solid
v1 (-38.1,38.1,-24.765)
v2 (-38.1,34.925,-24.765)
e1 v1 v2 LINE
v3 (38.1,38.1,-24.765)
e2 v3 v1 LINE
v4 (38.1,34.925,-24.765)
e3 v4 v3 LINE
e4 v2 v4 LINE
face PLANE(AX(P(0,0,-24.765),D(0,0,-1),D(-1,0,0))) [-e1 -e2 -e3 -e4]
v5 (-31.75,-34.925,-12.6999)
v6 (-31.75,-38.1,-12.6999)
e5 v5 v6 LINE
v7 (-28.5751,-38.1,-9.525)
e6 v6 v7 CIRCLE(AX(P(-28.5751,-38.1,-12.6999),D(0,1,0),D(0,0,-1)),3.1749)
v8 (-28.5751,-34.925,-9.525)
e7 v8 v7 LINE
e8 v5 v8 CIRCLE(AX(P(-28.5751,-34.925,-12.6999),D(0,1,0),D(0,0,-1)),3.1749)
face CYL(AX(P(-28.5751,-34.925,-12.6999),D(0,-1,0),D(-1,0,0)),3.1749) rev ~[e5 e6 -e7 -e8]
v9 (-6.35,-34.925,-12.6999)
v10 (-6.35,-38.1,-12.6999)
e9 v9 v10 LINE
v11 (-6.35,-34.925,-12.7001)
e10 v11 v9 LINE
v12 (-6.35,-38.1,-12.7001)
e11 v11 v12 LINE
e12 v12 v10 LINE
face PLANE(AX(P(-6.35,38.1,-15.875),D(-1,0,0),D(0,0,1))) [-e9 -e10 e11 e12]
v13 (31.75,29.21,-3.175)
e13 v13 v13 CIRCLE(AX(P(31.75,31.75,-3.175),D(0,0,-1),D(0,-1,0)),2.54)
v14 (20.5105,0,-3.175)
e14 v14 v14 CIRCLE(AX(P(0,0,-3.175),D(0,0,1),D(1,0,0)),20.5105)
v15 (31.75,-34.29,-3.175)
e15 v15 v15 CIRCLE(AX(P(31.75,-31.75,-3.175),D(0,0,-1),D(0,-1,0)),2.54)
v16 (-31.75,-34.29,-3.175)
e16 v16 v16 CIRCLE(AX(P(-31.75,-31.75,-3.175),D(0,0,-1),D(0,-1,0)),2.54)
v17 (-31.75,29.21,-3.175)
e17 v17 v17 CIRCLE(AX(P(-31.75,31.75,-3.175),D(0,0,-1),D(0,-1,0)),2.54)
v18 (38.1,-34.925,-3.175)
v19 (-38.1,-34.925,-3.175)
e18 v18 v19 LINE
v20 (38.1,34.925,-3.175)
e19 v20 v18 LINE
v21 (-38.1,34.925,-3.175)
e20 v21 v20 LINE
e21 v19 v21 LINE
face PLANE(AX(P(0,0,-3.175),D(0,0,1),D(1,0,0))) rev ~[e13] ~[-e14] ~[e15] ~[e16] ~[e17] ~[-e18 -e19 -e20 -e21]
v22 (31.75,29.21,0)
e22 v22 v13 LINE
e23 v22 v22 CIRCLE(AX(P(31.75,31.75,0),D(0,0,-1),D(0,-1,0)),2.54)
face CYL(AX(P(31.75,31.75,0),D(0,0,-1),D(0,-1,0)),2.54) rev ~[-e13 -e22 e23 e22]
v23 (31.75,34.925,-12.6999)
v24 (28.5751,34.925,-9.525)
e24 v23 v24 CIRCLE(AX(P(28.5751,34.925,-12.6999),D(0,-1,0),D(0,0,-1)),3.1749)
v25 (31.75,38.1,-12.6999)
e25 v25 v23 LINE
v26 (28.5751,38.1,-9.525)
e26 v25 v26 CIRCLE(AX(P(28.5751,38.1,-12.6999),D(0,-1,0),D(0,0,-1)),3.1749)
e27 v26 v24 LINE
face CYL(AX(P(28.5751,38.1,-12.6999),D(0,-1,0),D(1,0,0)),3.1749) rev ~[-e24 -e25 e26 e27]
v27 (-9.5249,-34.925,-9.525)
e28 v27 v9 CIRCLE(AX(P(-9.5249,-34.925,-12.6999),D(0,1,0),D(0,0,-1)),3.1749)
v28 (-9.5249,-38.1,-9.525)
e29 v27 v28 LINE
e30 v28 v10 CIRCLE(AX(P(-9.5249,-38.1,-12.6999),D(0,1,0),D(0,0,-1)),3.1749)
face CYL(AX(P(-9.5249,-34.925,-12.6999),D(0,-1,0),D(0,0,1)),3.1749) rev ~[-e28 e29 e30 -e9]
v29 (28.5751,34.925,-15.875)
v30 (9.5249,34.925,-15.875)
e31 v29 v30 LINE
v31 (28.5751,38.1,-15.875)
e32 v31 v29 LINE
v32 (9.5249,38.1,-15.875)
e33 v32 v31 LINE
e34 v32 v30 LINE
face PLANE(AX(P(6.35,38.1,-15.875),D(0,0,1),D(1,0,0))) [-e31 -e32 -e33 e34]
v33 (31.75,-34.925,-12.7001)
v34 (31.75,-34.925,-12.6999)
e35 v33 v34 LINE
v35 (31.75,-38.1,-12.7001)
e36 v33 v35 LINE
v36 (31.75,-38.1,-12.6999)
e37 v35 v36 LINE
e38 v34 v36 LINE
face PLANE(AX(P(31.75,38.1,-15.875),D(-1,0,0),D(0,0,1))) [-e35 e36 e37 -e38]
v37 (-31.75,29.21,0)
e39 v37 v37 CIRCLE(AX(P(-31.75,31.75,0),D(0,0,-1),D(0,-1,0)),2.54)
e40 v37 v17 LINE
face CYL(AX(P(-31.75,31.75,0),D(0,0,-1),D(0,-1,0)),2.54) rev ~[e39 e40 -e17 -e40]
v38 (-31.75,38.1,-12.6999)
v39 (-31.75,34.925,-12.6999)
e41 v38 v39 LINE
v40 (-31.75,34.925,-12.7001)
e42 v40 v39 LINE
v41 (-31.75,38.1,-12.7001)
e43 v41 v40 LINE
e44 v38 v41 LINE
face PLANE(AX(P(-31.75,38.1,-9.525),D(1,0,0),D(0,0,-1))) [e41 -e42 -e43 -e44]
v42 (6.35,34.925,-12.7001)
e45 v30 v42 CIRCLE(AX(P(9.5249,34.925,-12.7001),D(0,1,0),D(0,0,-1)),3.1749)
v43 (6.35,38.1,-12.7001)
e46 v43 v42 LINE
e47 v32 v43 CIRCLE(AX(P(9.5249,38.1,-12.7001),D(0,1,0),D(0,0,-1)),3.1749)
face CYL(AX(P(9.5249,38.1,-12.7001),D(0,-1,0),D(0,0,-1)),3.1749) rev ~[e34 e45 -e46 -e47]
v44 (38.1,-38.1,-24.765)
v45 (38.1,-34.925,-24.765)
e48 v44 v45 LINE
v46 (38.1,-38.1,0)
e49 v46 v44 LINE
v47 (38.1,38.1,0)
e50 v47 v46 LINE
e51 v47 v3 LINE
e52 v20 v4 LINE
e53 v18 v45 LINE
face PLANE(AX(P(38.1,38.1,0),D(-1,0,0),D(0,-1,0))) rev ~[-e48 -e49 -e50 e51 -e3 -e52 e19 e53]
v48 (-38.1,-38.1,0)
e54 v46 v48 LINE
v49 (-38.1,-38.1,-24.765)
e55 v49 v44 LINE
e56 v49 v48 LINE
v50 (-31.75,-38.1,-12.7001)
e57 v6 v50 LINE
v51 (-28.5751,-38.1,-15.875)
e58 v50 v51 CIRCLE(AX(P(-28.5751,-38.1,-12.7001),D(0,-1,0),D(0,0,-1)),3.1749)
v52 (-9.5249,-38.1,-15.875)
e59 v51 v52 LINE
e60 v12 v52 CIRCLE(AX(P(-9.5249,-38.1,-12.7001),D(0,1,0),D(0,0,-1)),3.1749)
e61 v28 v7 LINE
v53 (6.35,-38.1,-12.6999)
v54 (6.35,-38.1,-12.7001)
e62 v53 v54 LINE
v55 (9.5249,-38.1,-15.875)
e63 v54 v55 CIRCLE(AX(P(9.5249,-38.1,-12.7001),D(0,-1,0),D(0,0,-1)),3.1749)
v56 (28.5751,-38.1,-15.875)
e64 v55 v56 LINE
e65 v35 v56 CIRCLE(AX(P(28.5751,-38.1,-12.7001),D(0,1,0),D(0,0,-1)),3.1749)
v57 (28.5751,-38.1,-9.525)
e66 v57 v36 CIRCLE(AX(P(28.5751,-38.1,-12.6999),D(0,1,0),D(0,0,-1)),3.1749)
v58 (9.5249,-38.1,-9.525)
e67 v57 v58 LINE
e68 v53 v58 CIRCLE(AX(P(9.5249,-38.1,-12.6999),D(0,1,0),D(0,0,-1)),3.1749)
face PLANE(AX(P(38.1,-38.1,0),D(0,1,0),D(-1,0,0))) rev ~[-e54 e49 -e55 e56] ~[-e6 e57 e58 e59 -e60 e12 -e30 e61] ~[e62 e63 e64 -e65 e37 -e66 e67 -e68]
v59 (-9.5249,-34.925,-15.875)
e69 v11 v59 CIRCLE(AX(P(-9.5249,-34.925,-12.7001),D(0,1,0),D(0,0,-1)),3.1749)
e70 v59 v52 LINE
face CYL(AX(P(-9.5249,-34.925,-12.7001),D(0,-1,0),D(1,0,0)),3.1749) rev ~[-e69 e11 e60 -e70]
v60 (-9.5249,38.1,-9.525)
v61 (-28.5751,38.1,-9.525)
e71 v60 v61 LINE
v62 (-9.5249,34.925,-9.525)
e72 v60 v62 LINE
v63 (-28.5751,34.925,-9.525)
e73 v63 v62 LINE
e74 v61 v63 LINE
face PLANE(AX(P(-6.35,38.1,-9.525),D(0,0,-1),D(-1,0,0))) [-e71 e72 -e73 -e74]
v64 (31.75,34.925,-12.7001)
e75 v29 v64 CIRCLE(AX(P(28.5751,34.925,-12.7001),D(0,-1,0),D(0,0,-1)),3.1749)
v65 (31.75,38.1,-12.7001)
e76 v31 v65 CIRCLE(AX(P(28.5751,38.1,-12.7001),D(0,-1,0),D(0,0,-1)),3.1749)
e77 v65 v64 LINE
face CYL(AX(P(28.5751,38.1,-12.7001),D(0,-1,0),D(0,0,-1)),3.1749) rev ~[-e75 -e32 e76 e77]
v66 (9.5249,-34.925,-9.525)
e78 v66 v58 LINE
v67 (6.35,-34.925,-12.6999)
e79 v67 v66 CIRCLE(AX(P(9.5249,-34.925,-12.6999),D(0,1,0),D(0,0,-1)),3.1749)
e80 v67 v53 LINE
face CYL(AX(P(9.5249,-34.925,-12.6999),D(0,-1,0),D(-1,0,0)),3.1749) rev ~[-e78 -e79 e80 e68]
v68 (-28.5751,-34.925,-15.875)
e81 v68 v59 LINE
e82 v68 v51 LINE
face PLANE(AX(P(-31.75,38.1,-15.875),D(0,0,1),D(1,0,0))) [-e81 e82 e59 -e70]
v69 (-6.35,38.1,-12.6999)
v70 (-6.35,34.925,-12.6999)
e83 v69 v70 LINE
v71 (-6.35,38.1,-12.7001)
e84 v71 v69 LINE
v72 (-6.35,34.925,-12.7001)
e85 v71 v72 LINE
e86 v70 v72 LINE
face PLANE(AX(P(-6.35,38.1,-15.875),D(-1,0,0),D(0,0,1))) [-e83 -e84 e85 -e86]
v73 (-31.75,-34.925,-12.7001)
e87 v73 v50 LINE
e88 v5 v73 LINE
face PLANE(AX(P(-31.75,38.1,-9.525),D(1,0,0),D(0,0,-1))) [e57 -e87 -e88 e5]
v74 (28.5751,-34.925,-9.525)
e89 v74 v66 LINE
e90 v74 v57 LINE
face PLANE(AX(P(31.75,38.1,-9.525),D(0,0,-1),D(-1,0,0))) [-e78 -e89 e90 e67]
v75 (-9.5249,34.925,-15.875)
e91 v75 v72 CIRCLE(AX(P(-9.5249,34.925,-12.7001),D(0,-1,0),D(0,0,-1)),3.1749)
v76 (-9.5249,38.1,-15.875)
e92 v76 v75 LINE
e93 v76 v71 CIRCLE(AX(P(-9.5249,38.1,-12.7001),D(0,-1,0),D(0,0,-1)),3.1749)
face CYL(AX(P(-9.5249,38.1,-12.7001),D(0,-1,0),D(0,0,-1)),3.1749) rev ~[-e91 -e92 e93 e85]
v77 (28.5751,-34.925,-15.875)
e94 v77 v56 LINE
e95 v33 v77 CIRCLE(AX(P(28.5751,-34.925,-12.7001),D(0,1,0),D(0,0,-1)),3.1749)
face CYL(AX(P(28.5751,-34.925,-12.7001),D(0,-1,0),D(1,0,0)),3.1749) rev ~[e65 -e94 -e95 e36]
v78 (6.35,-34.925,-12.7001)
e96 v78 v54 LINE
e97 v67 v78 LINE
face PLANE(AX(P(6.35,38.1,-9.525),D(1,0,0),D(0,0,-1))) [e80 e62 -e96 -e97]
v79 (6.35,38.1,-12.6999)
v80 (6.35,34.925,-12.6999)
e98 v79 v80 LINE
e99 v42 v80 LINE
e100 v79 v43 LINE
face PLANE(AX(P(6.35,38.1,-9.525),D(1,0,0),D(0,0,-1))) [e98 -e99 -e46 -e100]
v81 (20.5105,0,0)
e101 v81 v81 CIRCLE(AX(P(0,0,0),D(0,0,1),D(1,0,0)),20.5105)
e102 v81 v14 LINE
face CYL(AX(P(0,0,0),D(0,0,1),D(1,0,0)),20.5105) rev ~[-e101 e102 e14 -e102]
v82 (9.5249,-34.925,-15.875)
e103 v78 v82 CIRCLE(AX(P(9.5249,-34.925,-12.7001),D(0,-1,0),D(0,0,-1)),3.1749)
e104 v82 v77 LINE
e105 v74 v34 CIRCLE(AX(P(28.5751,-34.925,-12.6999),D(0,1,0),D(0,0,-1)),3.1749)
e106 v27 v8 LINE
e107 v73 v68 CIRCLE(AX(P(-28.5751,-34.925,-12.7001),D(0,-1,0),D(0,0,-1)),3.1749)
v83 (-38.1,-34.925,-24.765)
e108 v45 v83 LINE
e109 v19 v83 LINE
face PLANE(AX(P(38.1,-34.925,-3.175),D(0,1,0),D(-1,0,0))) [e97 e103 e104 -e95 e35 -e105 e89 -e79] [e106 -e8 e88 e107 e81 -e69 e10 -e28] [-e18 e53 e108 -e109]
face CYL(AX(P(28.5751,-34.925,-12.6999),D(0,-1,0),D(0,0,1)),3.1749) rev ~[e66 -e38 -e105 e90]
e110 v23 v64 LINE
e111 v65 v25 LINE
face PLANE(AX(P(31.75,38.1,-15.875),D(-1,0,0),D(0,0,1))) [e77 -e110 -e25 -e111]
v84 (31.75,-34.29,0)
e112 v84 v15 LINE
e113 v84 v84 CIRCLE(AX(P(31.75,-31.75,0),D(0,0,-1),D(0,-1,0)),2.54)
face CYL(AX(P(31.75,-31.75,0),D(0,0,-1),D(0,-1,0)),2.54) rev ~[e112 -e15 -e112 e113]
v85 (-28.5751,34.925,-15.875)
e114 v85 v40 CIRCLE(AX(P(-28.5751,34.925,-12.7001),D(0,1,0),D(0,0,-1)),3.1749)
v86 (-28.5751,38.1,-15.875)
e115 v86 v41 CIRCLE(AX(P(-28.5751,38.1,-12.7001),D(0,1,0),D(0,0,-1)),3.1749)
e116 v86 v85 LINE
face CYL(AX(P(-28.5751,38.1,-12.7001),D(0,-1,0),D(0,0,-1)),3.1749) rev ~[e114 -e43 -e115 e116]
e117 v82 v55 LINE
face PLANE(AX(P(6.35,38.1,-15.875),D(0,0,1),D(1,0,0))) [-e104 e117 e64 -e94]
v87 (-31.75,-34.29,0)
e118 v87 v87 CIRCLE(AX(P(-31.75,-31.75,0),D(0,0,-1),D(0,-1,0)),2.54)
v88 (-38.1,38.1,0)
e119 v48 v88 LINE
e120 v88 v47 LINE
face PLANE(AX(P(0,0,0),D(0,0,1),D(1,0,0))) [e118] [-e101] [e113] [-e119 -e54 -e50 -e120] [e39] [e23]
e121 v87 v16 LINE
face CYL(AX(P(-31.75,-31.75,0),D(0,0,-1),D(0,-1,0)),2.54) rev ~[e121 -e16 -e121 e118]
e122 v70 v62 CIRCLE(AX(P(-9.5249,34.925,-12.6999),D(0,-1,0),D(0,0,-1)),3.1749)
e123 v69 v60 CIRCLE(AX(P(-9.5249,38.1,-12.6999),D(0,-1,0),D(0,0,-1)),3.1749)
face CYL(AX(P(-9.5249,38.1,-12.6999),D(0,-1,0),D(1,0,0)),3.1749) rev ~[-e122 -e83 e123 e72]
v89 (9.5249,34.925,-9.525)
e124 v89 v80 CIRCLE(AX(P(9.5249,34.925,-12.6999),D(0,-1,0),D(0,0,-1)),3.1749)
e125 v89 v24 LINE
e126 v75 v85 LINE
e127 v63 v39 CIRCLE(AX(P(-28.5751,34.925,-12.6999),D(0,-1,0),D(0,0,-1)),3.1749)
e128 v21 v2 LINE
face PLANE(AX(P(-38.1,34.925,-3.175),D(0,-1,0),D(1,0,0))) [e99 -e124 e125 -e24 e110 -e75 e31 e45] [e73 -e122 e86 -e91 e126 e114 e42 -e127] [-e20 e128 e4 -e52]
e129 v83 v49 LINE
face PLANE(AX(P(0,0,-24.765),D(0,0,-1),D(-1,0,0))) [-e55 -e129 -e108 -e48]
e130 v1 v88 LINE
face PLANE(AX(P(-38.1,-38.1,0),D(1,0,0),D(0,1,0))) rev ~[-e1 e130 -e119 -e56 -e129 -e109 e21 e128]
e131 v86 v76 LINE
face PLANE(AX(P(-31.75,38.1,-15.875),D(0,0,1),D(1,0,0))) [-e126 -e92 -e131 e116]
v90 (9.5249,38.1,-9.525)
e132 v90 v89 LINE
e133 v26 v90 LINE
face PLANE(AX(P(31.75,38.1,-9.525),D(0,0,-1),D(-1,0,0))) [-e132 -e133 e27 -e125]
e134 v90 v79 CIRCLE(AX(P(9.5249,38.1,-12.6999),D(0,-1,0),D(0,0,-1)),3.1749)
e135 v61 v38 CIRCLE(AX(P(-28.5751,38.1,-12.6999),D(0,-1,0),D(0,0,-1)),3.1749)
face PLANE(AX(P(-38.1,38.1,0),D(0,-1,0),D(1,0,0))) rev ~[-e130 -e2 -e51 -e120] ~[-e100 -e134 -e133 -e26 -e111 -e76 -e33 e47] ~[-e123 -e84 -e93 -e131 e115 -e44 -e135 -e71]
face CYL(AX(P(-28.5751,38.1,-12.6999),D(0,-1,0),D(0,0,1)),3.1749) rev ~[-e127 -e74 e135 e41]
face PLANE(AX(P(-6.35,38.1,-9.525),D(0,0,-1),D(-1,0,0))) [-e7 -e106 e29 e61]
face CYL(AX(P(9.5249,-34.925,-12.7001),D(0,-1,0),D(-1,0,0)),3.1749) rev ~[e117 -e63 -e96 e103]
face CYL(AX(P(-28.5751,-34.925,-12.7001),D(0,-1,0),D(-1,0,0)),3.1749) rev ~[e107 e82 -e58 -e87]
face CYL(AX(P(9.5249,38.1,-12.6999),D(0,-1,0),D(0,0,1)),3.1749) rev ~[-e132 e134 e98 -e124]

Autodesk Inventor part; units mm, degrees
ref_plane "YZ Plane" through (0, 0, 0) normal (1, 0, 0) x (0, 1, 0)
ref_plane "XZ Plane" through (0, 0, 0) normal (0, 1, 0) x (-1, 0, 0)
ref_plane "XY Plane" through (0, 0, 0) normal (0, 0, 1) x (1, 0, 0)
sketch "Sketch1" plane through (0, 0, 0) normal (0, 0, 1) x (1, 0, 0)
  line L0 (-38.1, 38.1) -> (38.1, 38.1)
  line L1 (38.1, 38.1) -> (38.1, -38.1)
  line L2 (38.1, -38.1) -> (-38.1, -38.1)
  line L3 (-38.1, -38.1) -> (-38.1, 38.1)
  circle A0 centre (0, 0) radius 20.5105
  point P0 (-31.75, 31.75)
  point P1 (31.75, 31.75)
  point P2 (31.75, -31.75)
  point P3 (-31.75, -31.75)
  dimension "d0" = 76.2
  dimension "d1" = 76.2
  dimension "d2" = 38.1
  dimension "d3" = 38.1
  dimension "d4" = 41.021
  dimension "d5" = 6.35
  dimension "d6" = 6.35
  dimension "d7" = 6.35
  dimension "d8" = 6.35
extrude "Extrusion1" add sketch "Sketch1" against normal blind 3.175
hole "Hole1" at (-31.75, 31.75, 0) at (31.75, 31.75, 0) at (31.75, -31.75, 0) at (-31.75, -31.75, 0) direction (0, 0, -1) diameter 5.08 end through all
sketch "Sketch3" plane through (0, 0, -3.175) normal (0, 0, -1) x (-1, 0, 0)
  line L0 (38.1, 38.1) -> (38.1, -38.1) projected
  line L1 (-38.1, -38.1) -> (-38.1, 38.1) projected
  line L2 (38.1, -38.1) -> (-38.1, -38.1) projected
  line L3 (-38.1, 38.1) -> (38.1, 38.1)
  line L4 (38.1, 38.1) -> (38.1, 34.925)
  line L5 (38.1, 34.925) -> (-38.1, 34.925)
  line L6 (-38.1, 34.925) -> (-38.1, 38.1)
  line L7 (-38.1, -34.925) -> (38.1, -34.925)
  line L8 (38.1, -34.925) -> (38.1, -38.1)
  line L9 (38.1, -38.1) -> (-38.1, -38.1)
  line L10 (-38.1, -38.1) -> (-38.1, -34.925)
  dimension "d32" = 3.175
  dimension "d33" = 3.175
extrude "Extrusion2" add sketch "Sketch3" along normal blind 21.59 contours L0 L5 L1 L3 | L0 L2 L1 L7
sketch "Sketch4" plane through (-38.1, 38.1, 0) normal (0, 1, 0) x (1, 0, 0)
  line L0 (0, 0) -> (0, 24.765) projected
  line L1 (0, 0) -> (76.2, 0) projected
  line L2 (76.2, 0) -> (76.2, 24.765) projected
  line L3 (6.35, 15.875) -> (31.75, 15.875)
  line L4 (31.75, 15.875) -> (31.75, 9.525)
  line L5 (31.75, 9.525) -> (6.35, 9.525)
  line L6 (6.35, 9.525) -> (6.35, 15.875)
  line L7 (44.45, 15.875) -> (69.85, 15.875)
  line L8 (69.85, 15.875) -> (69.85, 9.525)
  line L9 (69.85, 9.525) -> (44.45, 9.525)
  line L10 (44.45, 9.525) -> (44.45, 15.875)
  point P0 (38.1, 0)
  dimension "d36" = 6.35
  dimension "d37" = 9.525
  dimension "d38" = 6.35
  dimension "d39" = 6.35
  dimension "d40" = 25.4
  dimension "d41" = 6.35
  dimension "d42" = 25.4
extrude "Extrusion3" cut sketch "Sketch4" against normal through all
fillet "Fillet1" radius 3.175 16 edges at (6.35, 36.5125, -9.525) (6.35, 36.5125, -15.875) (31.75, 36.5125, -15.875) (31.75, 36.5125, -9.525) (-6.35, 36.5125, -9.525) (-6.35, 36.5125, -15.875) (-31.75, 36.5125, -15.875) (-31.75, 36.5125, -9.525) (6.35, -36.5125, -9.525) (6.35, -36.5125, -15.875) (31.75, -36.5125, -15.875) (31.75, -36.5125, -9.525) (-6.35, -36.5125, -9.525) (-6.35, -36.5125, -15.875) (-31.75, -36.5125, -15.875) (-31.75, -36.5125, -9.525)
equation "\"d2\" = 0.5 * d1"
equation "\"d3\" = 0.5 * d0"
equation "\"d7\" = d6"
equation "\"d8\" = d5"
equation "\"d38\" = d36"
equation "\"d41\" = d39"
equation "\"d42\" = d40"
properties part number "Btm Plate BD Motor mount"
